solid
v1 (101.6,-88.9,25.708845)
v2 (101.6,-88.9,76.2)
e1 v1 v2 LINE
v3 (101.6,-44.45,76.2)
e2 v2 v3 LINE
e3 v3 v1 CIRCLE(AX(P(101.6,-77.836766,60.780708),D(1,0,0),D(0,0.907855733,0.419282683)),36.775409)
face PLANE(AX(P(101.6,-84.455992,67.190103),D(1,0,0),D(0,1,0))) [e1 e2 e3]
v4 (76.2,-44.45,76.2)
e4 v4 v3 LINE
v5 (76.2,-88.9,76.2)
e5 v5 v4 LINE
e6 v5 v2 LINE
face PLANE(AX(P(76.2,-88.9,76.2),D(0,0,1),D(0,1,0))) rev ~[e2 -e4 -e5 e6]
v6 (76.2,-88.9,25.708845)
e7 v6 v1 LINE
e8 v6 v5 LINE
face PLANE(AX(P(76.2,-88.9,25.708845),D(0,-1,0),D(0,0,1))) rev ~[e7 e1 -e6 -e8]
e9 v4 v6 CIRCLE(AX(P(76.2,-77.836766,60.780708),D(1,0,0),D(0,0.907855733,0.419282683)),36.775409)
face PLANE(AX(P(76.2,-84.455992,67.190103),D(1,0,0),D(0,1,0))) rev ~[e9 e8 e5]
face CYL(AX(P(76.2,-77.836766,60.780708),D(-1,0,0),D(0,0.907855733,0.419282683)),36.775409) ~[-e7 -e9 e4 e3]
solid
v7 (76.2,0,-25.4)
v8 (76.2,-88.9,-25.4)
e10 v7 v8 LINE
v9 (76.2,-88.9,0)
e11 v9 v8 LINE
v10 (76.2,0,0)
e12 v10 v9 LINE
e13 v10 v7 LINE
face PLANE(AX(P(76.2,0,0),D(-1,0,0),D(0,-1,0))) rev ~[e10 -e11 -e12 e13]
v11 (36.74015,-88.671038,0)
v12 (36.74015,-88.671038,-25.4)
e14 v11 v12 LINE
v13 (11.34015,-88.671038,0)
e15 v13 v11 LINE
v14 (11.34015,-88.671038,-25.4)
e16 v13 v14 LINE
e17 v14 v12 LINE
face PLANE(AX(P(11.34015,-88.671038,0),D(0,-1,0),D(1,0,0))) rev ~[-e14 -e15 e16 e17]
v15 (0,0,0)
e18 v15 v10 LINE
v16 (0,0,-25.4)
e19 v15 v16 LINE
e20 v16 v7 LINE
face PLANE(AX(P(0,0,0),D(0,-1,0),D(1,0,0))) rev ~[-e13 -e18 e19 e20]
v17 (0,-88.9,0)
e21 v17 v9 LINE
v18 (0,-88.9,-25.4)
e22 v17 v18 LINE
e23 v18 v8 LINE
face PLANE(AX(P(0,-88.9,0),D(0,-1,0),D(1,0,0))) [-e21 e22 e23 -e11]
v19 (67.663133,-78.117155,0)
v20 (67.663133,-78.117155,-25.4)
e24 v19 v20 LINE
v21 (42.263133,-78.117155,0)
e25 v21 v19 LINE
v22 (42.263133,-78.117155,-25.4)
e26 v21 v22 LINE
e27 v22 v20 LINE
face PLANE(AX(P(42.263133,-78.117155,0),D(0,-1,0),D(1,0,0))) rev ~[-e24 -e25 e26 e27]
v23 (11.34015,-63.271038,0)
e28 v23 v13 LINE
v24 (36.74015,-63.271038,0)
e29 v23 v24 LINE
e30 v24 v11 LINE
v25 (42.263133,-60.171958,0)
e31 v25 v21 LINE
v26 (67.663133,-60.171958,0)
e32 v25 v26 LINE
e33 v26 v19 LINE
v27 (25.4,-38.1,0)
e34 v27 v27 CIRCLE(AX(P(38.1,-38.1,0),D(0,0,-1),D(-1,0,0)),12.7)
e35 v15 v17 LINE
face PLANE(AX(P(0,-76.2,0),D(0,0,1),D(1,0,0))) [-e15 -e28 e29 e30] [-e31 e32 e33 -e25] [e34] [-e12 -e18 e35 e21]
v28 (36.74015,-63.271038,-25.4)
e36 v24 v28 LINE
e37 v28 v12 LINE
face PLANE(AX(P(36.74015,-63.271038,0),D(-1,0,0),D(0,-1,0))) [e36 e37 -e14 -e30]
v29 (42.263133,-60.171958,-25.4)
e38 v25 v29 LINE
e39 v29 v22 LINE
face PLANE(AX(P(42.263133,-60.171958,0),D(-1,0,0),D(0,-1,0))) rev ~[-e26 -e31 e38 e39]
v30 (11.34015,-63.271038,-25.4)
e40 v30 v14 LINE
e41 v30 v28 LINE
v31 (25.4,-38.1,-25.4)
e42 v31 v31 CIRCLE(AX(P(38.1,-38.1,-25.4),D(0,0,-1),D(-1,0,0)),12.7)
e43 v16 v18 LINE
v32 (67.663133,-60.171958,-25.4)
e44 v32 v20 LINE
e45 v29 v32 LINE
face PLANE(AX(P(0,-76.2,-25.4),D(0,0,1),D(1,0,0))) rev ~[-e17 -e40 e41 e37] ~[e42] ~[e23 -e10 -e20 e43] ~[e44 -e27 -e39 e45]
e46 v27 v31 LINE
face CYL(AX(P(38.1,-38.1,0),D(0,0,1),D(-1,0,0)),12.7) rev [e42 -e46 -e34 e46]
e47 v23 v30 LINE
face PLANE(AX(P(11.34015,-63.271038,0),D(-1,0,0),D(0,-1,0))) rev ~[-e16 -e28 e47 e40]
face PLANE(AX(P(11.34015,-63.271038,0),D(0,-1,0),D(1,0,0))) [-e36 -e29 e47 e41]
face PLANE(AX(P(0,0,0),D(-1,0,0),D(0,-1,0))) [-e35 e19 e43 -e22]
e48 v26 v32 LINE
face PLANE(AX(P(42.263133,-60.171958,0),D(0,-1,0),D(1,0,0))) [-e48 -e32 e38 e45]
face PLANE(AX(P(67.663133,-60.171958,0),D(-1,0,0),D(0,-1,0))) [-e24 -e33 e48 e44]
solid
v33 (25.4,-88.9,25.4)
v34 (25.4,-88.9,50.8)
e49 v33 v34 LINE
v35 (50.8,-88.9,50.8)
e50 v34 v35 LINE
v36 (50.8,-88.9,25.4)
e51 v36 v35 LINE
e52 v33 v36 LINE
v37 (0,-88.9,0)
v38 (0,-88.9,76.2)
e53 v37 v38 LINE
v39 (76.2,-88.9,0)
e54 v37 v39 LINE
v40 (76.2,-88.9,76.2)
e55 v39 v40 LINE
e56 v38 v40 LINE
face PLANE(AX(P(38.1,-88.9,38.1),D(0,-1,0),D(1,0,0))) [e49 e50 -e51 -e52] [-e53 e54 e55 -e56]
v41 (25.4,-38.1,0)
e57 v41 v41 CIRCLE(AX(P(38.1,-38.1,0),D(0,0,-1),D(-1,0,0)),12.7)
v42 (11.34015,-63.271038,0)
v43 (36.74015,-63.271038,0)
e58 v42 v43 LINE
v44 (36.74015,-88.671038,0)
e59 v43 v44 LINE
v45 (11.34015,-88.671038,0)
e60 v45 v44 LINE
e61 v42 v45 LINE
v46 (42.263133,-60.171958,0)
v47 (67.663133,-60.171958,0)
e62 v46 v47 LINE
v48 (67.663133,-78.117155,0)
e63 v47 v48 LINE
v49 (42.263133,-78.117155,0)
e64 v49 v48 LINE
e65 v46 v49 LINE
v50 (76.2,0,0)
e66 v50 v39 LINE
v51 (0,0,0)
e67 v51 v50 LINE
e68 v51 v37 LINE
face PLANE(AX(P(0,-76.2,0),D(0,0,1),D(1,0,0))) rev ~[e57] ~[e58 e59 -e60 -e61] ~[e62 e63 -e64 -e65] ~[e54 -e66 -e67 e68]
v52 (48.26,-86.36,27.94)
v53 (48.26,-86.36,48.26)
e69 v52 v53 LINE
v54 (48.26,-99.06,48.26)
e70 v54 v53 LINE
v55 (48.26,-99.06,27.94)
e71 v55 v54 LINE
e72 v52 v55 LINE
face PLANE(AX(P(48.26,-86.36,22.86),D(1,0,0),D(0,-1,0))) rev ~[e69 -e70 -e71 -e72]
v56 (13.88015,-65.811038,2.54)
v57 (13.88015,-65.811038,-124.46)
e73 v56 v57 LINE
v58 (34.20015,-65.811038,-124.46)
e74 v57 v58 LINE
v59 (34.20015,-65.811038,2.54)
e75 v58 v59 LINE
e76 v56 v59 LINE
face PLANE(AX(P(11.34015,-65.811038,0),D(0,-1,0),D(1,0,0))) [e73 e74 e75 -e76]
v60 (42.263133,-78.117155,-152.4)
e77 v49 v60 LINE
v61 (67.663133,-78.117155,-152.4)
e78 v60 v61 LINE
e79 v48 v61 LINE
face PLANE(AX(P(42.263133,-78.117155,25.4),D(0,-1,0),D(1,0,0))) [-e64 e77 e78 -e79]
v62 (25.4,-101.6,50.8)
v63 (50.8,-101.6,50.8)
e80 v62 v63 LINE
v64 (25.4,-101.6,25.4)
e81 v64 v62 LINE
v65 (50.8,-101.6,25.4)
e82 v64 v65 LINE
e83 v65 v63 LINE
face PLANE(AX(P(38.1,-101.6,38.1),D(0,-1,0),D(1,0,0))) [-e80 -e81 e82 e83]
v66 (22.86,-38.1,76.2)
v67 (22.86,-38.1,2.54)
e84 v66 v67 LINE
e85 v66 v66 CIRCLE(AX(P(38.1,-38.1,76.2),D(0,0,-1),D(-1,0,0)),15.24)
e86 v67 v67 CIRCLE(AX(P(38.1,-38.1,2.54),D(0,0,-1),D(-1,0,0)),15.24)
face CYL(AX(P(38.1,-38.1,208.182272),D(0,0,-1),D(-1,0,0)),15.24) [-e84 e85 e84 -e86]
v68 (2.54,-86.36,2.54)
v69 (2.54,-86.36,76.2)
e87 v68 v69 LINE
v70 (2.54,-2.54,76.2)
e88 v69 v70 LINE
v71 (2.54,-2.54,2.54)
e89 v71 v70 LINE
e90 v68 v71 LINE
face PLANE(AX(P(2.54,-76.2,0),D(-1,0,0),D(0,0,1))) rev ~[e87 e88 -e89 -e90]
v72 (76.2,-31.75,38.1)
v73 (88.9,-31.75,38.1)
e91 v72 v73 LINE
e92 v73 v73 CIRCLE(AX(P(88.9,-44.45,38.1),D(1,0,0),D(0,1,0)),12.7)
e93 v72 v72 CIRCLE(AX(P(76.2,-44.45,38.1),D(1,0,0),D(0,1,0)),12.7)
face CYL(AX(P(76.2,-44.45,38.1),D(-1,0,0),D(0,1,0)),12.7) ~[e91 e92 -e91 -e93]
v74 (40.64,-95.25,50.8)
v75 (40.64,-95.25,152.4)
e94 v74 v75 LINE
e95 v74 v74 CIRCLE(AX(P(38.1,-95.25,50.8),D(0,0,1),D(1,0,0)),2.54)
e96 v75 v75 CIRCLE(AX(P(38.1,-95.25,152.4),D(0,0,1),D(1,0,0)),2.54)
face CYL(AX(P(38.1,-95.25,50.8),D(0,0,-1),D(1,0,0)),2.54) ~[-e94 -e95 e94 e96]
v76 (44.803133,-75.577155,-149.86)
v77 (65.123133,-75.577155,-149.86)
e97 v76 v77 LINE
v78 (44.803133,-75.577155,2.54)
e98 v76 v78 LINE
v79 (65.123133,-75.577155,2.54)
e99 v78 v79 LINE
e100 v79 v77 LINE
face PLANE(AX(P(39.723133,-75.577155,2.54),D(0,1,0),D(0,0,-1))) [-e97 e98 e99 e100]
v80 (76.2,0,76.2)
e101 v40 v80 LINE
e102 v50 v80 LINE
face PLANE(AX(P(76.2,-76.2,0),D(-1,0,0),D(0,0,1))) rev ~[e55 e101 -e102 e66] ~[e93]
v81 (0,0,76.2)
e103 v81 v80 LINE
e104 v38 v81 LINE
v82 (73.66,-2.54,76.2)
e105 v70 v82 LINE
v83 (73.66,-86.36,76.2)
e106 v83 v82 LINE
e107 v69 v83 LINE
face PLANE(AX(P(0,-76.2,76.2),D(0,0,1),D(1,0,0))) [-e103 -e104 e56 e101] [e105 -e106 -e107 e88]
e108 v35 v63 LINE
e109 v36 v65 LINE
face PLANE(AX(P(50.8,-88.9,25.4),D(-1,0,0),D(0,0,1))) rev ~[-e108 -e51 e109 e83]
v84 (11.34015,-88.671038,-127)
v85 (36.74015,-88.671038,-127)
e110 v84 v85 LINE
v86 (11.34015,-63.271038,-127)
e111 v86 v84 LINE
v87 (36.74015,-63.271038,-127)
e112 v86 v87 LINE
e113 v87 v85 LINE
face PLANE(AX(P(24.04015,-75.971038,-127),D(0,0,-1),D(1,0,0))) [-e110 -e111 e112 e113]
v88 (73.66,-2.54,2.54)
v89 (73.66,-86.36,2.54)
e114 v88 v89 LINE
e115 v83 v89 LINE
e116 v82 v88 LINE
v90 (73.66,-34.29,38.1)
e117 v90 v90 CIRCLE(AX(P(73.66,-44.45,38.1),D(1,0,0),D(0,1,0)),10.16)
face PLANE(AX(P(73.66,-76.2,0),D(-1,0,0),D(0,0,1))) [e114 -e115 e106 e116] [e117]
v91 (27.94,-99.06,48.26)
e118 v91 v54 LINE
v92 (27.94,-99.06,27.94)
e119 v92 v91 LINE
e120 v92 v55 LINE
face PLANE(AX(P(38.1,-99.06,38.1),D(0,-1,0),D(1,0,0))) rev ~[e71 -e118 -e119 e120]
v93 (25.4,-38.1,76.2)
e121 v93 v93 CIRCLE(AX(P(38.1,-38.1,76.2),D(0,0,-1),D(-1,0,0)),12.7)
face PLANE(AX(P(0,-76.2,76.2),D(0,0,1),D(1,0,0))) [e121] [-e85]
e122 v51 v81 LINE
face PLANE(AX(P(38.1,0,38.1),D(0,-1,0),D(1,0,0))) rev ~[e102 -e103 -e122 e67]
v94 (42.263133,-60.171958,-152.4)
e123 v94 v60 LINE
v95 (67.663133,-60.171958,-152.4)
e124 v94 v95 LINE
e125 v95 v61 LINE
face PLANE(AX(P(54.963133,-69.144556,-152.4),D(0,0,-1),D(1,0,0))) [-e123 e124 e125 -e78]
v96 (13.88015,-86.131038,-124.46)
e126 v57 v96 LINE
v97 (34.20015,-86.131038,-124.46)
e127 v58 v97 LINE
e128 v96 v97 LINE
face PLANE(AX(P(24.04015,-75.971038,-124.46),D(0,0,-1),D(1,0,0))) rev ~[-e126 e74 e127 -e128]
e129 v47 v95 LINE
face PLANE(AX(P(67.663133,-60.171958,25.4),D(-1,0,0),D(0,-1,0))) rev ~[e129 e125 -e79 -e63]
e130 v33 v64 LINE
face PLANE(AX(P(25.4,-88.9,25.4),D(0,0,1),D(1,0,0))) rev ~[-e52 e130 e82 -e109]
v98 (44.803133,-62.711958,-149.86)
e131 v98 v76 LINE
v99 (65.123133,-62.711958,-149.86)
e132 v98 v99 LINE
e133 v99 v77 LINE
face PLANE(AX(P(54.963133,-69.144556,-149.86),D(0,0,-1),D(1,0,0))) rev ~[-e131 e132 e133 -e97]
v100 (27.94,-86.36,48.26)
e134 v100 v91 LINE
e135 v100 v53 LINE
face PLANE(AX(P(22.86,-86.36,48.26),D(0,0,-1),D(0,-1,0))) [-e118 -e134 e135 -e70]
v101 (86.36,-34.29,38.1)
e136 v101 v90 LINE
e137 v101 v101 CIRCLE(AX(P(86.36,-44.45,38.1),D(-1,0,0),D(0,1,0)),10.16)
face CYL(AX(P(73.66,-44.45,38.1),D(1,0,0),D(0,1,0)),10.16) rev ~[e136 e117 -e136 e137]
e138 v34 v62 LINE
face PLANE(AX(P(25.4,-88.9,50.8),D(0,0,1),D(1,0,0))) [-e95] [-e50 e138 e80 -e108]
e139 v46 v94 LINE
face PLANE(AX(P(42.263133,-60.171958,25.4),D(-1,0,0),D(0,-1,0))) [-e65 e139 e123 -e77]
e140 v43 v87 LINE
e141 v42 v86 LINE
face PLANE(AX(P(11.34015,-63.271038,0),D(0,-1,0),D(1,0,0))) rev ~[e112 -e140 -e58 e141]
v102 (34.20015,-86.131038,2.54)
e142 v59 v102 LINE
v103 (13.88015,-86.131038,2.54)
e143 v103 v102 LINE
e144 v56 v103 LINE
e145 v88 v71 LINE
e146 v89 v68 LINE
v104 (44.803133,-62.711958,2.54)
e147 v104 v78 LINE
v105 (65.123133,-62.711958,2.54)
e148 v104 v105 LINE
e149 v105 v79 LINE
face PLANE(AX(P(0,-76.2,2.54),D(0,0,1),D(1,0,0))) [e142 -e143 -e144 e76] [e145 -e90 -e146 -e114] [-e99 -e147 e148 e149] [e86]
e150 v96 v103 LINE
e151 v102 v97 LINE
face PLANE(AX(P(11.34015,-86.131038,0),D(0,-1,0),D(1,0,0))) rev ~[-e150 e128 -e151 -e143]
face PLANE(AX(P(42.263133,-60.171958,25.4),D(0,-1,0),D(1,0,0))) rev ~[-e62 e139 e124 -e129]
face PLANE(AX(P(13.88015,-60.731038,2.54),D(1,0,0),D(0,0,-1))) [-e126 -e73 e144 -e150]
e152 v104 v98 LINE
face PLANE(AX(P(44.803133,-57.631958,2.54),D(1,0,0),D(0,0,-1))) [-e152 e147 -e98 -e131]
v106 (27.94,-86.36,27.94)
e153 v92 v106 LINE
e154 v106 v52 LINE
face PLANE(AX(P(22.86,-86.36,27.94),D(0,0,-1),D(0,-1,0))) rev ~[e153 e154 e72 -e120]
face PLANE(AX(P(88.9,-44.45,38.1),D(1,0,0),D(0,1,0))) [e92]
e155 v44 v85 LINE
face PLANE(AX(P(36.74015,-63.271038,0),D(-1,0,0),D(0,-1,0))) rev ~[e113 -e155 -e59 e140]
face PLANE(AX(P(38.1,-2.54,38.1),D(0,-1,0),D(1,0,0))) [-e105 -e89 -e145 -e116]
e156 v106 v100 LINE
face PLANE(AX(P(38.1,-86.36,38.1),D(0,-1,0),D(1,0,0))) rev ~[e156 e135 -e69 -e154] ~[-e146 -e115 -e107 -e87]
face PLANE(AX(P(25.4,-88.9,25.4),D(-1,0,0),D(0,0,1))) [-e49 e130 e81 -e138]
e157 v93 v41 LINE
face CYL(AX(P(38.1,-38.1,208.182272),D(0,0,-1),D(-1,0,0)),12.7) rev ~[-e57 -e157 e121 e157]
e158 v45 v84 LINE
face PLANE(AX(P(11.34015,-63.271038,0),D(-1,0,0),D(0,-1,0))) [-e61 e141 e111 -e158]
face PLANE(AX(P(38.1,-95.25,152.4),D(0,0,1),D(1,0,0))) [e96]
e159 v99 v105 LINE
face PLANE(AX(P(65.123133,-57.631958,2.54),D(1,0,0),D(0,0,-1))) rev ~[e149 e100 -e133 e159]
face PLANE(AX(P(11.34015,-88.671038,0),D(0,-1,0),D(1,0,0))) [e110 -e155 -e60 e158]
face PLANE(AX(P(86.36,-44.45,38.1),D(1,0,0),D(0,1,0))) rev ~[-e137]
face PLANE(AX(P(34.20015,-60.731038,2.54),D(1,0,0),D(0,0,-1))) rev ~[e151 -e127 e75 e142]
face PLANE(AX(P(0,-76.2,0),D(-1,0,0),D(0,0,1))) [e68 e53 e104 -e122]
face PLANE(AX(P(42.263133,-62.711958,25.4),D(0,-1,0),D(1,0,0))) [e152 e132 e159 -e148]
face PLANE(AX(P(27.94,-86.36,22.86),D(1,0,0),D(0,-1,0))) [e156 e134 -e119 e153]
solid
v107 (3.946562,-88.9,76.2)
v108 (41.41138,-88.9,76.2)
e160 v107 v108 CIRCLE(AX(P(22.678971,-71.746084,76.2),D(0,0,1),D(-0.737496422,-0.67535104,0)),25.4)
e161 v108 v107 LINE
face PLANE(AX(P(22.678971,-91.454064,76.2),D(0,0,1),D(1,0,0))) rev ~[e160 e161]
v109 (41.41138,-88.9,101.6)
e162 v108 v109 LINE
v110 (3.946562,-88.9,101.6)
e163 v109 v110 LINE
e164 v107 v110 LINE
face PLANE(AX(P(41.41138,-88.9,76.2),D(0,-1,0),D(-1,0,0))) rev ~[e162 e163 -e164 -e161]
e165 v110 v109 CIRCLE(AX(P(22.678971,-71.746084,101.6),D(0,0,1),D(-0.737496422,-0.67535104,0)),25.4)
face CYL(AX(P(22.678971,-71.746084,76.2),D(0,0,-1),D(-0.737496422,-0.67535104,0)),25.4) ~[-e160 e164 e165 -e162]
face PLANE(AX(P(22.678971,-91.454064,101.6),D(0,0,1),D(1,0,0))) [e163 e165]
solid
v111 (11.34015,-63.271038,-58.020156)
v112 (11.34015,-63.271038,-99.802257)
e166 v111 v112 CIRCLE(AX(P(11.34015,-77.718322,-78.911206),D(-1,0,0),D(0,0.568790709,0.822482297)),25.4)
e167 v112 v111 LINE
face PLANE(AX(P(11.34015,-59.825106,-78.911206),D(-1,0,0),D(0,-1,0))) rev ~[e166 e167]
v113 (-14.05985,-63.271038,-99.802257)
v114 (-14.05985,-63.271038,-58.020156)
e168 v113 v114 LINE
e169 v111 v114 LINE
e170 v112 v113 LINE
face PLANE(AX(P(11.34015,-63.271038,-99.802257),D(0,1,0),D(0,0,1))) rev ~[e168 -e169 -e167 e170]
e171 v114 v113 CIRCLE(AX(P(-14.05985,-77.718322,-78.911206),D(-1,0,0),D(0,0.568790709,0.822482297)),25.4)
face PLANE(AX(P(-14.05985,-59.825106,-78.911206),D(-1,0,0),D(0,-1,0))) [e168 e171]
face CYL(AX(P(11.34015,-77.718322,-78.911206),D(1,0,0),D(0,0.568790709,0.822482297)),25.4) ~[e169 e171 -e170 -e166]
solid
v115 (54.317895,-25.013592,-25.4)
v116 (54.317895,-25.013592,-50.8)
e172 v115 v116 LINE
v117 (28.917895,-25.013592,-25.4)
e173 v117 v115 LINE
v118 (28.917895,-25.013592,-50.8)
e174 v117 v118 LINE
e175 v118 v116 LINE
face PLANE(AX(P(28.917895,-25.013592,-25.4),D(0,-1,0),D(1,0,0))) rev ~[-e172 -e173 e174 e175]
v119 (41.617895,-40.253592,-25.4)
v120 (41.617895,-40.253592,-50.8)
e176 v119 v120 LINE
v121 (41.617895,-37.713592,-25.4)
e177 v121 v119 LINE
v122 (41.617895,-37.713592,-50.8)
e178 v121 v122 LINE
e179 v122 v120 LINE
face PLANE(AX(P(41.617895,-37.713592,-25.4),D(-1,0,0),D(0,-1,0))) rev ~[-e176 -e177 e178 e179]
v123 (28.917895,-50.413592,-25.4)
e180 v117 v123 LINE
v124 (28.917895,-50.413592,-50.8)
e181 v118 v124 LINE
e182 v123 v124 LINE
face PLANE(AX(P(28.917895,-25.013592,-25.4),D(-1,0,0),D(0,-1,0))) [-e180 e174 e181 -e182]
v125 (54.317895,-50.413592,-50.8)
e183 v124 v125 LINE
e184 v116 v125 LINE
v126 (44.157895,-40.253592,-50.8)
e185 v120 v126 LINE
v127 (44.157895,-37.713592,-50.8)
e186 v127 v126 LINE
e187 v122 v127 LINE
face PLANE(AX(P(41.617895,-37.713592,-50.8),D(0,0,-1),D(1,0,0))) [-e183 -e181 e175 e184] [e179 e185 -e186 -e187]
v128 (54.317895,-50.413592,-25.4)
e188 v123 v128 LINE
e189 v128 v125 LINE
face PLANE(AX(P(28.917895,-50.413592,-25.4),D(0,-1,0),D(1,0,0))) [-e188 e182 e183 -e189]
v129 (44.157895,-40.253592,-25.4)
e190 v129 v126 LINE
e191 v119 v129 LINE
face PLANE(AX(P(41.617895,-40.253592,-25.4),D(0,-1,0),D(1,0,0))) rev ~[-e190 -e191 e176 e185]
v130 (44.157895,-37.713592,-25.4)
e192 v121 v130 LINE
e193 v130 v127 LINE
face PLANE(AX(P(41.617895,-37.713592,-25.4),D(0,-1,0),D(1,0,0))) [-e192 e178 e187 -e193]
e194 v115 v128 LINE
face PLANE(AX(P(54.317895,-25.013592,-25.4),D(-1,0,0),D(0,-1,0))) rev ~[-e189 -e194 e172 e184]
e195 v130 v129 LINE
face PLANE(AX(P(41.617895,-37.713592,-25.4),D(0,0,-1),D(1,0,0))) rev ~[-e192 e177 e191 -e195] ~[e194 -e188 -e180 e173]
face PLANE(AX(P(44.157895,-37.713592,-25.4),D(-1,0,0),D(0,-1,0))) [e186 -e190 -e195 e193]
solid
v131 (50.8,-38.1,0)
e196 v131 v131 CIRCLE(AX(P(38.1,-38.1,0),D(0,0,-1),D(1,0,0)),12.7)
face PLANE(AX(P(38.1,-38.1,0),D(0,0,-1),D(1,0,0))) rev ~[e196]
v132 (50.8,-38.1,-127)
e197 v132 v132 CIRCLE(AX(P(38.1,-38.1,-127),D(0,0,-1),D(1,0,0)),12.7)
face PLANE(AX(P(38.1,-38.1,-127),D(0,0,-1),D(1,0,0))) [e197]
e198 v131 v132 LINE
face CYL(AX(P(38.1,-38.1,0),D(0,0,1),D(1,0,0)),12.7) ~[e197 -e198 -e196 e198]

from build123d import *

# Parameters (mm, degrees)
F0_W          = 76.2
F0_H          = 76.2
F1_DEPTH      = 76.2
F3_D          = 25.4
F5_W          = 76.2
F5_H          = 76.2
F5_W_2        = 25.4
F5_H_2        = 25.4
F1_FACE1_W    = 76.2
F1_FACE1_H    = 76.2
F1_FACE2_W    = 76.2
F1_FACE2_H    = 76.2
F4_W          = 76.2
F4_H          = 76.2
F6_DEPTH      = 12.7
F7_W          = 25.4
F7_H          = 25.4
F8_DEPTH      = 12.7
F9_R          = 12.7
F10_DEPTH     = 12.7
F11_DEPTH     = 12.7
F14_DEPTH     = 25.4
F16_DEPTH     = 25.4
F17_R         = 2.54
F18_DEPTH     = 101.6
F21_W         = 25.4
F21_H         = 17.9451964796
F22_DEPTH     = 177.8
F23_W         = 25.4
F23_H         = 25.4
F24_DEPTH     = 127
F23_R         = 12.7
F25_DEPTH     = 25.4
F26_W         = 25.4
F26_H         = 25.4
F26_W_2       = 2.54
F26_H_2       = 2.54
F27_DEPTH     = 25.4
F28_T         = 2.54
F28_T3_DEPTH  = 30.48
F28_T5_DEPTH  = 30.48
F28_T7_DEPTH  = 30.48
F28_T9_DEPTH  = 30.48
F28_T11_DEPTH = 23.0251964796
F28_T13_DEPTH = 30.48
F30_DEPTH     = 25.4


# Not quite as in the source:
# - a shell that OpenCascade refuses in one call is made with other operations: the cavity is built on its own and cut out
# - the program builds the solid bodies; features that only make, move or delete a surface that nothing else refers to are left out


with BuildPart() as f1:
    # F0 (on Front) → F1 (new body)
    with BuildSketch(Plane.XZ):
        with Locations((38.1, 38.1)):
            Rectangle(F0_W, F0_H)
    extrude(amount=F1_DEPTH)

    # F3 (through all)
    with Locations(Plane.XY.offset(76.2)):
        with Locations((38.1, -38.1)):
            Hole(F3_D / 2)

    # F5 (on face) + F1_face1 (on face) + F1_face2 (on face) + F4 (on face) → F6 (join)
    with BuildSketch(Plane.XZ.offset(76.2)):
        with Locations((38.1, 38.1)):
            Rectangle(F5_W, F5_H)
        with Locations((42.7430447519, 38.5519705385)):
            Rectangle(F5_W_2, F5_H_2, mode=Mode.SUBTRACT)
        with Locations((42.7430447519, 38.5519705385)):
            Rectangle(F5_W_2, F5_H_2)
    with BuildSketch(Plane(origin=(38.1, -76.2, 38.1), x_dir=(1, 0, 0), z_dir=(0, -1, 0))):
        Rectangle(F1_FACE1_W, F1_FACE1_H)
    with BuildSketch(Plane(origin=(38.1, 0, 38.1), x_dir=(1, 0, 0), z_dir=(0, 1, 0))):
        Rectangle(F1_FACE2_W, F1_FACE2_H)
    with BuildSketch(Plane.XZ.offset(76.2)):
        with Locations((38.1, 38.1)):
            Rectangle(F4_W, F4_H)
    extrude(amount=F6_DEPTH, dir=(0, -1, 0))

    # F7 (on face) → F8 (join)
    with BuildSketch(Plane.XZ.offset(88.9)):
        with Locations((38.1, 38.1)):
            Rectangle(F7_W, F7_H)
    extrude(amount=F8_DEPTH)

    # F9 (on face) → F10 (join)
    with BuildSketch(Plane.YZ.offset(76.2)):
        with Locations((-44.45, 38.1)):
            Circle(F9_R)
    extrude(amount=F10_DEPTH)

    # F9 (on face) → F11 (join)
    with BuildSketch(Plane.YZ.offset(76.2)):
        with Locations((-44.45, 38.1)):
            Circle(F9_R)
    extrude(amount=F11_DEPTH)

    # F17 (on face) → F18 (join)
    with BuildSketch(Plane.XY.offset(50.8)):
        with Locations((38.1, -95.25)):
            Circle(F17_R)
    extrude(amount=F18_DEPTH)

    # F21 (on face) → F22 (join)
    with BuildSketch(Plane(origin=(0, 0, 25.4), x_dir=(1, 0, 0), z_dir=(0, 0, -1))):
        with Locations((54.9631331444, 69.1445562989)):
            Rectangle(F21_W, F21_H)
    extrude(amount=F22_DEPTH)

    # F23 (on face) → F24 (join)
    with BuildSketch(Plane(origin=(0, 0, 0), x_dir=(1, 0, 0), z_dir=(0, 0, -1))):
        with Locations((24.0401503026, 75.9710382342)):
            Rectangle(F23_W, F23_H)
    extrude(amount=F24_DEPTH)


with BuildPart() as f14:
    # F13 (on face) → F14 (new body)
    with BuildSketch(Plane.XY.offset(76.2)):
        with BuildLine():
            Line((41.4113799153, -88.9), (3.9465616716, -88.9))
            ThreePointArc((3.9465616716, -88.9), (22.6789707935, -97.1460835815), (41.4113799153, -88.9))
        make_face()
    extrude(amount=F14_DEPTH)


with BuildPart() as f16:
    # F15 (on face) → F16 (new body)
    with BuildSketch(Plane.YZ.offset(76.2)):
        with BuildLine():
            Line((-88.9, 76.2), (-44.45, 76.2))
            ThreePointArc((-44.45, 76.2), (-105.4397398951, 85.081047549), (-88.9, 25.7088454487))
            Line((-88.9, 25.7088454487), (-88.9, 76.2))
        make_face()
    extrude(amount=F16_DEPTH)


with BuildPart() as f24:
    # F23 (on face) → F24, piece 2 (new body)
    with BuildSketch(Plane(origin=(0, 0, 0), x_dir=(1, 0, 0), z_dir=(0, 0, -1))):
        with Locations((38.1, 38.1)):
            Circle(F23_R)
    extrude(amount=F24_DEPTH)


with BuildPart() as f25:
    # F25 (new): a face of the model
    f25_faces = [f1.part.faces().sort_by_distance(p)[0] for p in [
        (38.1, -1.1708821461, 0),
    ]]
    extrude(f25_faces, amount=F25_DEPTH)


with BuildPart() as f27:
    # F26 (on face) → F27 (new body)
    with BuildSketch(Plane(origin=(0, 0, -25.4), x_dir=(1, 0, 0), z_dir=(0, 0, -1))):
        with Locations((41.617895323, 37.7135920942)):
            Rectangle(F26_W, F26_H)
        with Locations((42.887895323, 38.9835920942)):
            Rectangle(F26_W_2, F26_H_2, mode=Mode.SUBTRACT)
    extrude(amount=F27_DEPTH)


with BuildPart() as f1_1:
    add(f1.part)

    # F28: shell of thickness 2.54, made by hand


with BuildPart() as f28_core1:
    # F28_t2: copy of F1
    add(f1_1.part)

    # the walls: a layer under each face that stays
    f28_faces = [f28_core1.faces().sort_by_distance(p)[0] for p in [
        (0, -44.45, 38.1),
        (38.1, 0, 38.1),
        (12.7, -88.9, 12.7),
        (12.7, -44.45, 0),
        (76.2, -74.0833333333, 12.7),
        (25.4, -38.1, 38.1),
        (46.5666666667, -99.4833333333, 50.8),
        (25.4, -95.25, 38.1),
        (38.1, -95.25, 25.4),
        (50.8, -95.25, 38.1),
        (11.3401503026, -75.9710382342, -63.5),
        (24.0401503026, -88.6710382342, -63.5),
        (36.7401503026, -75.9710382342, -63.5),
        (24.0401503026, -63.2710382342, -63.5),
        (67.6631331444, -69.1445562989, -76.2),
        (54.9631331444, -60.1719580591, -76.2),
        (54.9631331444, -78.1171545386, -76.2),
        (42.2631331444, -69.1445562989, -76.2),
        (82.55, -57.15, 38.1),
        (38.1, -101.6, 38.1),
        (24.0401503026, -75.9710382342, -127),
        (54.9631331444, -69.1445562989, -152.4),
        (88.9, -44.45, 38.1),
        (38.1, -95.25, 152.4),
    ]]
    thicken(f28_faces, amount=-F28_T, mode=Mode.SUBTRACT)

    # F28_s4 → F28_t3 (cut)
    with BuildSketch(Plane.YZ.offset(22.86)):
        Polygon((-88.9254, 50.8254), (-86.36, 50.8), (-86.36, 48.26), (-88.9, 48.26), align=None)
        Polygon((-88.9254, 25.3746), (-86.36, 25.4), (-86.36, 27.94), (-88.9, 27.94), align=None)
    extrude(amount=F28_T3_DEPTH, mode=Mode.SUBTRACT)

    # F28_s6 → F28_t5 (cut)
    with BuildSketch(Plane.XY.offset(22.86)):
        Polygon((25.3746, -88.9254), (25.4, -86.36), (27.94, -86.36), (27.94, -88.9), align=None)
        Polygon((50.8254, -88.9254), (50.8, -86.36), (48.26, -86.36), (48.26, -88.9), align=None)
    extrude(amount=F28_T5_DEPTH, mode=Mode.SUBTRACT)

    # F28_s8 → F28_t7 (cut)
    with BuildSketch(Plane.XZ.offset(60.7310382342)):
        Polygon((11.3147503026, -0.0254), (11.3401503026, 2.54), (13.8801503026, 2.54), (13.8801503026, 0), align=None)
        Polygon((36.7655503026, -0.0254), (36.7401503026, 2.54), (34.2001503026, 2.54), (34.2001503026, 0), align=None)
    extrude(amount=F28_T7_DEPTH, mode=Mode.SUBTRACT)

    # F28_s10 → F28_t9 (cut)
    with BuildSketch(Plane.YZ.offset(8.8001503026)):
        Polygon((-88.6964382342, -0.0254), (-88.6710382342, 2.54), (-86.1310382342, 2.54), (-86.1310382342, 0), align=None)
        Polygon((-63.2456382342, -0.0254), (-63.2710382342, 2.54), (-65.8110382342, 2.54), (-65.8110382342, 0), align=None)
    extrude(amount=F28_T9_DEPTH, mode=Mode.SUBTRACT)

    # F28_s12 → F28_t11 (cut)
    with BuildSketch(Plane.XZ.offset(57.6319580591)):
        Polygon((67.6885331444, -0.0254), (67.6631331444, 2.54), (65.1231331444, 2.54), (65.1231331444, 0), align=None)
        Polygon((42.2377331444, -0.0254), (42.2631331444, 2.54), (44.8031331444, 2.54), (44.8031331444, 0), align=None)
    extrude(amount=F28_T11_DEPTH, mode=Mode.SUBTRACT)

    # F28_s14 → F28_t13 (cut)
    with BuildSketch(Plane.YZ.offset(39.7231331444)):
        Polygon((-60.1465580591, -0.0254), (-60.1719580591, 2.54), (-62.7119580591, 2.54), (-62.7119580591, 0), align=None)
        Polygon((-78.1425545386, -0.0254), (-78.1171545386, 2.54), (-75.5771545386, 2.54), (-75.5771545386, 0), align=None)
    extrude(amount=F28_T13_DEPTH, mode=Mode.SUBTRACT)

    # F28_s15 → F28_t16 (revolve, cut)
    with BuildSketch(Plane.XY.offset(38.1)):
        Polygon((76.2254, -31.7246), (73.66, -31.75), (73.66, -34.29), (76.2, -34.29), align=None)
    revolve(axis=Axis((76.2, -44.45, 38.1), (1, 0, 0)), mode=Mode.SUBTRACT)

    # F28_s17 → F28_t18 (revolve, cut)
    with BuildSketch(Plane.XZ.offset(95.25)):
        Polygon((40.6654, 50.8254), (40.64, 48.26), (38.1, 48.26), (38.1, 50.8), align=None)
    revolve(axis=Axis((38.1, -95.25, 50.8), (0, 0, 1)), mode=Mode.SUBTRACT)


with BuildPart() as f1_2:
    add(f1_1.part)

    # what is left inside the walls is the cavity
    f28_cavity = [f28_core1.part.solids().sort_by_distance(p)[0] for p in [
        (22.8346, -38.1, 27.093333),
    ]]
    add(f28_cavity, mode=Mode.SUBTRACT)


with BuildPart() as f30:
    # F29 (on face) → F30 (new body)
    with BuildSketch(Plane(origin=(11.3401503026, 0, 0), x_dir=(0, -1, 0), z_dir=(-1, 0, 0))):
        with BuildLine():
            Line((63.2710382342, -99.802256586), (63.2710382342, -58.0201558769))
            ThreePointArc((63.2710382342, -58.0201558769), (52.3183222379, -78.9112062314), (63.2710382342, -99.802256586))
        make_face()
    extrude(amount=F30_DEPTH)


solid = Compound([f14.part, f16.part, f24.part, f25.part, f27.part, f1_2.part, f30.part])
